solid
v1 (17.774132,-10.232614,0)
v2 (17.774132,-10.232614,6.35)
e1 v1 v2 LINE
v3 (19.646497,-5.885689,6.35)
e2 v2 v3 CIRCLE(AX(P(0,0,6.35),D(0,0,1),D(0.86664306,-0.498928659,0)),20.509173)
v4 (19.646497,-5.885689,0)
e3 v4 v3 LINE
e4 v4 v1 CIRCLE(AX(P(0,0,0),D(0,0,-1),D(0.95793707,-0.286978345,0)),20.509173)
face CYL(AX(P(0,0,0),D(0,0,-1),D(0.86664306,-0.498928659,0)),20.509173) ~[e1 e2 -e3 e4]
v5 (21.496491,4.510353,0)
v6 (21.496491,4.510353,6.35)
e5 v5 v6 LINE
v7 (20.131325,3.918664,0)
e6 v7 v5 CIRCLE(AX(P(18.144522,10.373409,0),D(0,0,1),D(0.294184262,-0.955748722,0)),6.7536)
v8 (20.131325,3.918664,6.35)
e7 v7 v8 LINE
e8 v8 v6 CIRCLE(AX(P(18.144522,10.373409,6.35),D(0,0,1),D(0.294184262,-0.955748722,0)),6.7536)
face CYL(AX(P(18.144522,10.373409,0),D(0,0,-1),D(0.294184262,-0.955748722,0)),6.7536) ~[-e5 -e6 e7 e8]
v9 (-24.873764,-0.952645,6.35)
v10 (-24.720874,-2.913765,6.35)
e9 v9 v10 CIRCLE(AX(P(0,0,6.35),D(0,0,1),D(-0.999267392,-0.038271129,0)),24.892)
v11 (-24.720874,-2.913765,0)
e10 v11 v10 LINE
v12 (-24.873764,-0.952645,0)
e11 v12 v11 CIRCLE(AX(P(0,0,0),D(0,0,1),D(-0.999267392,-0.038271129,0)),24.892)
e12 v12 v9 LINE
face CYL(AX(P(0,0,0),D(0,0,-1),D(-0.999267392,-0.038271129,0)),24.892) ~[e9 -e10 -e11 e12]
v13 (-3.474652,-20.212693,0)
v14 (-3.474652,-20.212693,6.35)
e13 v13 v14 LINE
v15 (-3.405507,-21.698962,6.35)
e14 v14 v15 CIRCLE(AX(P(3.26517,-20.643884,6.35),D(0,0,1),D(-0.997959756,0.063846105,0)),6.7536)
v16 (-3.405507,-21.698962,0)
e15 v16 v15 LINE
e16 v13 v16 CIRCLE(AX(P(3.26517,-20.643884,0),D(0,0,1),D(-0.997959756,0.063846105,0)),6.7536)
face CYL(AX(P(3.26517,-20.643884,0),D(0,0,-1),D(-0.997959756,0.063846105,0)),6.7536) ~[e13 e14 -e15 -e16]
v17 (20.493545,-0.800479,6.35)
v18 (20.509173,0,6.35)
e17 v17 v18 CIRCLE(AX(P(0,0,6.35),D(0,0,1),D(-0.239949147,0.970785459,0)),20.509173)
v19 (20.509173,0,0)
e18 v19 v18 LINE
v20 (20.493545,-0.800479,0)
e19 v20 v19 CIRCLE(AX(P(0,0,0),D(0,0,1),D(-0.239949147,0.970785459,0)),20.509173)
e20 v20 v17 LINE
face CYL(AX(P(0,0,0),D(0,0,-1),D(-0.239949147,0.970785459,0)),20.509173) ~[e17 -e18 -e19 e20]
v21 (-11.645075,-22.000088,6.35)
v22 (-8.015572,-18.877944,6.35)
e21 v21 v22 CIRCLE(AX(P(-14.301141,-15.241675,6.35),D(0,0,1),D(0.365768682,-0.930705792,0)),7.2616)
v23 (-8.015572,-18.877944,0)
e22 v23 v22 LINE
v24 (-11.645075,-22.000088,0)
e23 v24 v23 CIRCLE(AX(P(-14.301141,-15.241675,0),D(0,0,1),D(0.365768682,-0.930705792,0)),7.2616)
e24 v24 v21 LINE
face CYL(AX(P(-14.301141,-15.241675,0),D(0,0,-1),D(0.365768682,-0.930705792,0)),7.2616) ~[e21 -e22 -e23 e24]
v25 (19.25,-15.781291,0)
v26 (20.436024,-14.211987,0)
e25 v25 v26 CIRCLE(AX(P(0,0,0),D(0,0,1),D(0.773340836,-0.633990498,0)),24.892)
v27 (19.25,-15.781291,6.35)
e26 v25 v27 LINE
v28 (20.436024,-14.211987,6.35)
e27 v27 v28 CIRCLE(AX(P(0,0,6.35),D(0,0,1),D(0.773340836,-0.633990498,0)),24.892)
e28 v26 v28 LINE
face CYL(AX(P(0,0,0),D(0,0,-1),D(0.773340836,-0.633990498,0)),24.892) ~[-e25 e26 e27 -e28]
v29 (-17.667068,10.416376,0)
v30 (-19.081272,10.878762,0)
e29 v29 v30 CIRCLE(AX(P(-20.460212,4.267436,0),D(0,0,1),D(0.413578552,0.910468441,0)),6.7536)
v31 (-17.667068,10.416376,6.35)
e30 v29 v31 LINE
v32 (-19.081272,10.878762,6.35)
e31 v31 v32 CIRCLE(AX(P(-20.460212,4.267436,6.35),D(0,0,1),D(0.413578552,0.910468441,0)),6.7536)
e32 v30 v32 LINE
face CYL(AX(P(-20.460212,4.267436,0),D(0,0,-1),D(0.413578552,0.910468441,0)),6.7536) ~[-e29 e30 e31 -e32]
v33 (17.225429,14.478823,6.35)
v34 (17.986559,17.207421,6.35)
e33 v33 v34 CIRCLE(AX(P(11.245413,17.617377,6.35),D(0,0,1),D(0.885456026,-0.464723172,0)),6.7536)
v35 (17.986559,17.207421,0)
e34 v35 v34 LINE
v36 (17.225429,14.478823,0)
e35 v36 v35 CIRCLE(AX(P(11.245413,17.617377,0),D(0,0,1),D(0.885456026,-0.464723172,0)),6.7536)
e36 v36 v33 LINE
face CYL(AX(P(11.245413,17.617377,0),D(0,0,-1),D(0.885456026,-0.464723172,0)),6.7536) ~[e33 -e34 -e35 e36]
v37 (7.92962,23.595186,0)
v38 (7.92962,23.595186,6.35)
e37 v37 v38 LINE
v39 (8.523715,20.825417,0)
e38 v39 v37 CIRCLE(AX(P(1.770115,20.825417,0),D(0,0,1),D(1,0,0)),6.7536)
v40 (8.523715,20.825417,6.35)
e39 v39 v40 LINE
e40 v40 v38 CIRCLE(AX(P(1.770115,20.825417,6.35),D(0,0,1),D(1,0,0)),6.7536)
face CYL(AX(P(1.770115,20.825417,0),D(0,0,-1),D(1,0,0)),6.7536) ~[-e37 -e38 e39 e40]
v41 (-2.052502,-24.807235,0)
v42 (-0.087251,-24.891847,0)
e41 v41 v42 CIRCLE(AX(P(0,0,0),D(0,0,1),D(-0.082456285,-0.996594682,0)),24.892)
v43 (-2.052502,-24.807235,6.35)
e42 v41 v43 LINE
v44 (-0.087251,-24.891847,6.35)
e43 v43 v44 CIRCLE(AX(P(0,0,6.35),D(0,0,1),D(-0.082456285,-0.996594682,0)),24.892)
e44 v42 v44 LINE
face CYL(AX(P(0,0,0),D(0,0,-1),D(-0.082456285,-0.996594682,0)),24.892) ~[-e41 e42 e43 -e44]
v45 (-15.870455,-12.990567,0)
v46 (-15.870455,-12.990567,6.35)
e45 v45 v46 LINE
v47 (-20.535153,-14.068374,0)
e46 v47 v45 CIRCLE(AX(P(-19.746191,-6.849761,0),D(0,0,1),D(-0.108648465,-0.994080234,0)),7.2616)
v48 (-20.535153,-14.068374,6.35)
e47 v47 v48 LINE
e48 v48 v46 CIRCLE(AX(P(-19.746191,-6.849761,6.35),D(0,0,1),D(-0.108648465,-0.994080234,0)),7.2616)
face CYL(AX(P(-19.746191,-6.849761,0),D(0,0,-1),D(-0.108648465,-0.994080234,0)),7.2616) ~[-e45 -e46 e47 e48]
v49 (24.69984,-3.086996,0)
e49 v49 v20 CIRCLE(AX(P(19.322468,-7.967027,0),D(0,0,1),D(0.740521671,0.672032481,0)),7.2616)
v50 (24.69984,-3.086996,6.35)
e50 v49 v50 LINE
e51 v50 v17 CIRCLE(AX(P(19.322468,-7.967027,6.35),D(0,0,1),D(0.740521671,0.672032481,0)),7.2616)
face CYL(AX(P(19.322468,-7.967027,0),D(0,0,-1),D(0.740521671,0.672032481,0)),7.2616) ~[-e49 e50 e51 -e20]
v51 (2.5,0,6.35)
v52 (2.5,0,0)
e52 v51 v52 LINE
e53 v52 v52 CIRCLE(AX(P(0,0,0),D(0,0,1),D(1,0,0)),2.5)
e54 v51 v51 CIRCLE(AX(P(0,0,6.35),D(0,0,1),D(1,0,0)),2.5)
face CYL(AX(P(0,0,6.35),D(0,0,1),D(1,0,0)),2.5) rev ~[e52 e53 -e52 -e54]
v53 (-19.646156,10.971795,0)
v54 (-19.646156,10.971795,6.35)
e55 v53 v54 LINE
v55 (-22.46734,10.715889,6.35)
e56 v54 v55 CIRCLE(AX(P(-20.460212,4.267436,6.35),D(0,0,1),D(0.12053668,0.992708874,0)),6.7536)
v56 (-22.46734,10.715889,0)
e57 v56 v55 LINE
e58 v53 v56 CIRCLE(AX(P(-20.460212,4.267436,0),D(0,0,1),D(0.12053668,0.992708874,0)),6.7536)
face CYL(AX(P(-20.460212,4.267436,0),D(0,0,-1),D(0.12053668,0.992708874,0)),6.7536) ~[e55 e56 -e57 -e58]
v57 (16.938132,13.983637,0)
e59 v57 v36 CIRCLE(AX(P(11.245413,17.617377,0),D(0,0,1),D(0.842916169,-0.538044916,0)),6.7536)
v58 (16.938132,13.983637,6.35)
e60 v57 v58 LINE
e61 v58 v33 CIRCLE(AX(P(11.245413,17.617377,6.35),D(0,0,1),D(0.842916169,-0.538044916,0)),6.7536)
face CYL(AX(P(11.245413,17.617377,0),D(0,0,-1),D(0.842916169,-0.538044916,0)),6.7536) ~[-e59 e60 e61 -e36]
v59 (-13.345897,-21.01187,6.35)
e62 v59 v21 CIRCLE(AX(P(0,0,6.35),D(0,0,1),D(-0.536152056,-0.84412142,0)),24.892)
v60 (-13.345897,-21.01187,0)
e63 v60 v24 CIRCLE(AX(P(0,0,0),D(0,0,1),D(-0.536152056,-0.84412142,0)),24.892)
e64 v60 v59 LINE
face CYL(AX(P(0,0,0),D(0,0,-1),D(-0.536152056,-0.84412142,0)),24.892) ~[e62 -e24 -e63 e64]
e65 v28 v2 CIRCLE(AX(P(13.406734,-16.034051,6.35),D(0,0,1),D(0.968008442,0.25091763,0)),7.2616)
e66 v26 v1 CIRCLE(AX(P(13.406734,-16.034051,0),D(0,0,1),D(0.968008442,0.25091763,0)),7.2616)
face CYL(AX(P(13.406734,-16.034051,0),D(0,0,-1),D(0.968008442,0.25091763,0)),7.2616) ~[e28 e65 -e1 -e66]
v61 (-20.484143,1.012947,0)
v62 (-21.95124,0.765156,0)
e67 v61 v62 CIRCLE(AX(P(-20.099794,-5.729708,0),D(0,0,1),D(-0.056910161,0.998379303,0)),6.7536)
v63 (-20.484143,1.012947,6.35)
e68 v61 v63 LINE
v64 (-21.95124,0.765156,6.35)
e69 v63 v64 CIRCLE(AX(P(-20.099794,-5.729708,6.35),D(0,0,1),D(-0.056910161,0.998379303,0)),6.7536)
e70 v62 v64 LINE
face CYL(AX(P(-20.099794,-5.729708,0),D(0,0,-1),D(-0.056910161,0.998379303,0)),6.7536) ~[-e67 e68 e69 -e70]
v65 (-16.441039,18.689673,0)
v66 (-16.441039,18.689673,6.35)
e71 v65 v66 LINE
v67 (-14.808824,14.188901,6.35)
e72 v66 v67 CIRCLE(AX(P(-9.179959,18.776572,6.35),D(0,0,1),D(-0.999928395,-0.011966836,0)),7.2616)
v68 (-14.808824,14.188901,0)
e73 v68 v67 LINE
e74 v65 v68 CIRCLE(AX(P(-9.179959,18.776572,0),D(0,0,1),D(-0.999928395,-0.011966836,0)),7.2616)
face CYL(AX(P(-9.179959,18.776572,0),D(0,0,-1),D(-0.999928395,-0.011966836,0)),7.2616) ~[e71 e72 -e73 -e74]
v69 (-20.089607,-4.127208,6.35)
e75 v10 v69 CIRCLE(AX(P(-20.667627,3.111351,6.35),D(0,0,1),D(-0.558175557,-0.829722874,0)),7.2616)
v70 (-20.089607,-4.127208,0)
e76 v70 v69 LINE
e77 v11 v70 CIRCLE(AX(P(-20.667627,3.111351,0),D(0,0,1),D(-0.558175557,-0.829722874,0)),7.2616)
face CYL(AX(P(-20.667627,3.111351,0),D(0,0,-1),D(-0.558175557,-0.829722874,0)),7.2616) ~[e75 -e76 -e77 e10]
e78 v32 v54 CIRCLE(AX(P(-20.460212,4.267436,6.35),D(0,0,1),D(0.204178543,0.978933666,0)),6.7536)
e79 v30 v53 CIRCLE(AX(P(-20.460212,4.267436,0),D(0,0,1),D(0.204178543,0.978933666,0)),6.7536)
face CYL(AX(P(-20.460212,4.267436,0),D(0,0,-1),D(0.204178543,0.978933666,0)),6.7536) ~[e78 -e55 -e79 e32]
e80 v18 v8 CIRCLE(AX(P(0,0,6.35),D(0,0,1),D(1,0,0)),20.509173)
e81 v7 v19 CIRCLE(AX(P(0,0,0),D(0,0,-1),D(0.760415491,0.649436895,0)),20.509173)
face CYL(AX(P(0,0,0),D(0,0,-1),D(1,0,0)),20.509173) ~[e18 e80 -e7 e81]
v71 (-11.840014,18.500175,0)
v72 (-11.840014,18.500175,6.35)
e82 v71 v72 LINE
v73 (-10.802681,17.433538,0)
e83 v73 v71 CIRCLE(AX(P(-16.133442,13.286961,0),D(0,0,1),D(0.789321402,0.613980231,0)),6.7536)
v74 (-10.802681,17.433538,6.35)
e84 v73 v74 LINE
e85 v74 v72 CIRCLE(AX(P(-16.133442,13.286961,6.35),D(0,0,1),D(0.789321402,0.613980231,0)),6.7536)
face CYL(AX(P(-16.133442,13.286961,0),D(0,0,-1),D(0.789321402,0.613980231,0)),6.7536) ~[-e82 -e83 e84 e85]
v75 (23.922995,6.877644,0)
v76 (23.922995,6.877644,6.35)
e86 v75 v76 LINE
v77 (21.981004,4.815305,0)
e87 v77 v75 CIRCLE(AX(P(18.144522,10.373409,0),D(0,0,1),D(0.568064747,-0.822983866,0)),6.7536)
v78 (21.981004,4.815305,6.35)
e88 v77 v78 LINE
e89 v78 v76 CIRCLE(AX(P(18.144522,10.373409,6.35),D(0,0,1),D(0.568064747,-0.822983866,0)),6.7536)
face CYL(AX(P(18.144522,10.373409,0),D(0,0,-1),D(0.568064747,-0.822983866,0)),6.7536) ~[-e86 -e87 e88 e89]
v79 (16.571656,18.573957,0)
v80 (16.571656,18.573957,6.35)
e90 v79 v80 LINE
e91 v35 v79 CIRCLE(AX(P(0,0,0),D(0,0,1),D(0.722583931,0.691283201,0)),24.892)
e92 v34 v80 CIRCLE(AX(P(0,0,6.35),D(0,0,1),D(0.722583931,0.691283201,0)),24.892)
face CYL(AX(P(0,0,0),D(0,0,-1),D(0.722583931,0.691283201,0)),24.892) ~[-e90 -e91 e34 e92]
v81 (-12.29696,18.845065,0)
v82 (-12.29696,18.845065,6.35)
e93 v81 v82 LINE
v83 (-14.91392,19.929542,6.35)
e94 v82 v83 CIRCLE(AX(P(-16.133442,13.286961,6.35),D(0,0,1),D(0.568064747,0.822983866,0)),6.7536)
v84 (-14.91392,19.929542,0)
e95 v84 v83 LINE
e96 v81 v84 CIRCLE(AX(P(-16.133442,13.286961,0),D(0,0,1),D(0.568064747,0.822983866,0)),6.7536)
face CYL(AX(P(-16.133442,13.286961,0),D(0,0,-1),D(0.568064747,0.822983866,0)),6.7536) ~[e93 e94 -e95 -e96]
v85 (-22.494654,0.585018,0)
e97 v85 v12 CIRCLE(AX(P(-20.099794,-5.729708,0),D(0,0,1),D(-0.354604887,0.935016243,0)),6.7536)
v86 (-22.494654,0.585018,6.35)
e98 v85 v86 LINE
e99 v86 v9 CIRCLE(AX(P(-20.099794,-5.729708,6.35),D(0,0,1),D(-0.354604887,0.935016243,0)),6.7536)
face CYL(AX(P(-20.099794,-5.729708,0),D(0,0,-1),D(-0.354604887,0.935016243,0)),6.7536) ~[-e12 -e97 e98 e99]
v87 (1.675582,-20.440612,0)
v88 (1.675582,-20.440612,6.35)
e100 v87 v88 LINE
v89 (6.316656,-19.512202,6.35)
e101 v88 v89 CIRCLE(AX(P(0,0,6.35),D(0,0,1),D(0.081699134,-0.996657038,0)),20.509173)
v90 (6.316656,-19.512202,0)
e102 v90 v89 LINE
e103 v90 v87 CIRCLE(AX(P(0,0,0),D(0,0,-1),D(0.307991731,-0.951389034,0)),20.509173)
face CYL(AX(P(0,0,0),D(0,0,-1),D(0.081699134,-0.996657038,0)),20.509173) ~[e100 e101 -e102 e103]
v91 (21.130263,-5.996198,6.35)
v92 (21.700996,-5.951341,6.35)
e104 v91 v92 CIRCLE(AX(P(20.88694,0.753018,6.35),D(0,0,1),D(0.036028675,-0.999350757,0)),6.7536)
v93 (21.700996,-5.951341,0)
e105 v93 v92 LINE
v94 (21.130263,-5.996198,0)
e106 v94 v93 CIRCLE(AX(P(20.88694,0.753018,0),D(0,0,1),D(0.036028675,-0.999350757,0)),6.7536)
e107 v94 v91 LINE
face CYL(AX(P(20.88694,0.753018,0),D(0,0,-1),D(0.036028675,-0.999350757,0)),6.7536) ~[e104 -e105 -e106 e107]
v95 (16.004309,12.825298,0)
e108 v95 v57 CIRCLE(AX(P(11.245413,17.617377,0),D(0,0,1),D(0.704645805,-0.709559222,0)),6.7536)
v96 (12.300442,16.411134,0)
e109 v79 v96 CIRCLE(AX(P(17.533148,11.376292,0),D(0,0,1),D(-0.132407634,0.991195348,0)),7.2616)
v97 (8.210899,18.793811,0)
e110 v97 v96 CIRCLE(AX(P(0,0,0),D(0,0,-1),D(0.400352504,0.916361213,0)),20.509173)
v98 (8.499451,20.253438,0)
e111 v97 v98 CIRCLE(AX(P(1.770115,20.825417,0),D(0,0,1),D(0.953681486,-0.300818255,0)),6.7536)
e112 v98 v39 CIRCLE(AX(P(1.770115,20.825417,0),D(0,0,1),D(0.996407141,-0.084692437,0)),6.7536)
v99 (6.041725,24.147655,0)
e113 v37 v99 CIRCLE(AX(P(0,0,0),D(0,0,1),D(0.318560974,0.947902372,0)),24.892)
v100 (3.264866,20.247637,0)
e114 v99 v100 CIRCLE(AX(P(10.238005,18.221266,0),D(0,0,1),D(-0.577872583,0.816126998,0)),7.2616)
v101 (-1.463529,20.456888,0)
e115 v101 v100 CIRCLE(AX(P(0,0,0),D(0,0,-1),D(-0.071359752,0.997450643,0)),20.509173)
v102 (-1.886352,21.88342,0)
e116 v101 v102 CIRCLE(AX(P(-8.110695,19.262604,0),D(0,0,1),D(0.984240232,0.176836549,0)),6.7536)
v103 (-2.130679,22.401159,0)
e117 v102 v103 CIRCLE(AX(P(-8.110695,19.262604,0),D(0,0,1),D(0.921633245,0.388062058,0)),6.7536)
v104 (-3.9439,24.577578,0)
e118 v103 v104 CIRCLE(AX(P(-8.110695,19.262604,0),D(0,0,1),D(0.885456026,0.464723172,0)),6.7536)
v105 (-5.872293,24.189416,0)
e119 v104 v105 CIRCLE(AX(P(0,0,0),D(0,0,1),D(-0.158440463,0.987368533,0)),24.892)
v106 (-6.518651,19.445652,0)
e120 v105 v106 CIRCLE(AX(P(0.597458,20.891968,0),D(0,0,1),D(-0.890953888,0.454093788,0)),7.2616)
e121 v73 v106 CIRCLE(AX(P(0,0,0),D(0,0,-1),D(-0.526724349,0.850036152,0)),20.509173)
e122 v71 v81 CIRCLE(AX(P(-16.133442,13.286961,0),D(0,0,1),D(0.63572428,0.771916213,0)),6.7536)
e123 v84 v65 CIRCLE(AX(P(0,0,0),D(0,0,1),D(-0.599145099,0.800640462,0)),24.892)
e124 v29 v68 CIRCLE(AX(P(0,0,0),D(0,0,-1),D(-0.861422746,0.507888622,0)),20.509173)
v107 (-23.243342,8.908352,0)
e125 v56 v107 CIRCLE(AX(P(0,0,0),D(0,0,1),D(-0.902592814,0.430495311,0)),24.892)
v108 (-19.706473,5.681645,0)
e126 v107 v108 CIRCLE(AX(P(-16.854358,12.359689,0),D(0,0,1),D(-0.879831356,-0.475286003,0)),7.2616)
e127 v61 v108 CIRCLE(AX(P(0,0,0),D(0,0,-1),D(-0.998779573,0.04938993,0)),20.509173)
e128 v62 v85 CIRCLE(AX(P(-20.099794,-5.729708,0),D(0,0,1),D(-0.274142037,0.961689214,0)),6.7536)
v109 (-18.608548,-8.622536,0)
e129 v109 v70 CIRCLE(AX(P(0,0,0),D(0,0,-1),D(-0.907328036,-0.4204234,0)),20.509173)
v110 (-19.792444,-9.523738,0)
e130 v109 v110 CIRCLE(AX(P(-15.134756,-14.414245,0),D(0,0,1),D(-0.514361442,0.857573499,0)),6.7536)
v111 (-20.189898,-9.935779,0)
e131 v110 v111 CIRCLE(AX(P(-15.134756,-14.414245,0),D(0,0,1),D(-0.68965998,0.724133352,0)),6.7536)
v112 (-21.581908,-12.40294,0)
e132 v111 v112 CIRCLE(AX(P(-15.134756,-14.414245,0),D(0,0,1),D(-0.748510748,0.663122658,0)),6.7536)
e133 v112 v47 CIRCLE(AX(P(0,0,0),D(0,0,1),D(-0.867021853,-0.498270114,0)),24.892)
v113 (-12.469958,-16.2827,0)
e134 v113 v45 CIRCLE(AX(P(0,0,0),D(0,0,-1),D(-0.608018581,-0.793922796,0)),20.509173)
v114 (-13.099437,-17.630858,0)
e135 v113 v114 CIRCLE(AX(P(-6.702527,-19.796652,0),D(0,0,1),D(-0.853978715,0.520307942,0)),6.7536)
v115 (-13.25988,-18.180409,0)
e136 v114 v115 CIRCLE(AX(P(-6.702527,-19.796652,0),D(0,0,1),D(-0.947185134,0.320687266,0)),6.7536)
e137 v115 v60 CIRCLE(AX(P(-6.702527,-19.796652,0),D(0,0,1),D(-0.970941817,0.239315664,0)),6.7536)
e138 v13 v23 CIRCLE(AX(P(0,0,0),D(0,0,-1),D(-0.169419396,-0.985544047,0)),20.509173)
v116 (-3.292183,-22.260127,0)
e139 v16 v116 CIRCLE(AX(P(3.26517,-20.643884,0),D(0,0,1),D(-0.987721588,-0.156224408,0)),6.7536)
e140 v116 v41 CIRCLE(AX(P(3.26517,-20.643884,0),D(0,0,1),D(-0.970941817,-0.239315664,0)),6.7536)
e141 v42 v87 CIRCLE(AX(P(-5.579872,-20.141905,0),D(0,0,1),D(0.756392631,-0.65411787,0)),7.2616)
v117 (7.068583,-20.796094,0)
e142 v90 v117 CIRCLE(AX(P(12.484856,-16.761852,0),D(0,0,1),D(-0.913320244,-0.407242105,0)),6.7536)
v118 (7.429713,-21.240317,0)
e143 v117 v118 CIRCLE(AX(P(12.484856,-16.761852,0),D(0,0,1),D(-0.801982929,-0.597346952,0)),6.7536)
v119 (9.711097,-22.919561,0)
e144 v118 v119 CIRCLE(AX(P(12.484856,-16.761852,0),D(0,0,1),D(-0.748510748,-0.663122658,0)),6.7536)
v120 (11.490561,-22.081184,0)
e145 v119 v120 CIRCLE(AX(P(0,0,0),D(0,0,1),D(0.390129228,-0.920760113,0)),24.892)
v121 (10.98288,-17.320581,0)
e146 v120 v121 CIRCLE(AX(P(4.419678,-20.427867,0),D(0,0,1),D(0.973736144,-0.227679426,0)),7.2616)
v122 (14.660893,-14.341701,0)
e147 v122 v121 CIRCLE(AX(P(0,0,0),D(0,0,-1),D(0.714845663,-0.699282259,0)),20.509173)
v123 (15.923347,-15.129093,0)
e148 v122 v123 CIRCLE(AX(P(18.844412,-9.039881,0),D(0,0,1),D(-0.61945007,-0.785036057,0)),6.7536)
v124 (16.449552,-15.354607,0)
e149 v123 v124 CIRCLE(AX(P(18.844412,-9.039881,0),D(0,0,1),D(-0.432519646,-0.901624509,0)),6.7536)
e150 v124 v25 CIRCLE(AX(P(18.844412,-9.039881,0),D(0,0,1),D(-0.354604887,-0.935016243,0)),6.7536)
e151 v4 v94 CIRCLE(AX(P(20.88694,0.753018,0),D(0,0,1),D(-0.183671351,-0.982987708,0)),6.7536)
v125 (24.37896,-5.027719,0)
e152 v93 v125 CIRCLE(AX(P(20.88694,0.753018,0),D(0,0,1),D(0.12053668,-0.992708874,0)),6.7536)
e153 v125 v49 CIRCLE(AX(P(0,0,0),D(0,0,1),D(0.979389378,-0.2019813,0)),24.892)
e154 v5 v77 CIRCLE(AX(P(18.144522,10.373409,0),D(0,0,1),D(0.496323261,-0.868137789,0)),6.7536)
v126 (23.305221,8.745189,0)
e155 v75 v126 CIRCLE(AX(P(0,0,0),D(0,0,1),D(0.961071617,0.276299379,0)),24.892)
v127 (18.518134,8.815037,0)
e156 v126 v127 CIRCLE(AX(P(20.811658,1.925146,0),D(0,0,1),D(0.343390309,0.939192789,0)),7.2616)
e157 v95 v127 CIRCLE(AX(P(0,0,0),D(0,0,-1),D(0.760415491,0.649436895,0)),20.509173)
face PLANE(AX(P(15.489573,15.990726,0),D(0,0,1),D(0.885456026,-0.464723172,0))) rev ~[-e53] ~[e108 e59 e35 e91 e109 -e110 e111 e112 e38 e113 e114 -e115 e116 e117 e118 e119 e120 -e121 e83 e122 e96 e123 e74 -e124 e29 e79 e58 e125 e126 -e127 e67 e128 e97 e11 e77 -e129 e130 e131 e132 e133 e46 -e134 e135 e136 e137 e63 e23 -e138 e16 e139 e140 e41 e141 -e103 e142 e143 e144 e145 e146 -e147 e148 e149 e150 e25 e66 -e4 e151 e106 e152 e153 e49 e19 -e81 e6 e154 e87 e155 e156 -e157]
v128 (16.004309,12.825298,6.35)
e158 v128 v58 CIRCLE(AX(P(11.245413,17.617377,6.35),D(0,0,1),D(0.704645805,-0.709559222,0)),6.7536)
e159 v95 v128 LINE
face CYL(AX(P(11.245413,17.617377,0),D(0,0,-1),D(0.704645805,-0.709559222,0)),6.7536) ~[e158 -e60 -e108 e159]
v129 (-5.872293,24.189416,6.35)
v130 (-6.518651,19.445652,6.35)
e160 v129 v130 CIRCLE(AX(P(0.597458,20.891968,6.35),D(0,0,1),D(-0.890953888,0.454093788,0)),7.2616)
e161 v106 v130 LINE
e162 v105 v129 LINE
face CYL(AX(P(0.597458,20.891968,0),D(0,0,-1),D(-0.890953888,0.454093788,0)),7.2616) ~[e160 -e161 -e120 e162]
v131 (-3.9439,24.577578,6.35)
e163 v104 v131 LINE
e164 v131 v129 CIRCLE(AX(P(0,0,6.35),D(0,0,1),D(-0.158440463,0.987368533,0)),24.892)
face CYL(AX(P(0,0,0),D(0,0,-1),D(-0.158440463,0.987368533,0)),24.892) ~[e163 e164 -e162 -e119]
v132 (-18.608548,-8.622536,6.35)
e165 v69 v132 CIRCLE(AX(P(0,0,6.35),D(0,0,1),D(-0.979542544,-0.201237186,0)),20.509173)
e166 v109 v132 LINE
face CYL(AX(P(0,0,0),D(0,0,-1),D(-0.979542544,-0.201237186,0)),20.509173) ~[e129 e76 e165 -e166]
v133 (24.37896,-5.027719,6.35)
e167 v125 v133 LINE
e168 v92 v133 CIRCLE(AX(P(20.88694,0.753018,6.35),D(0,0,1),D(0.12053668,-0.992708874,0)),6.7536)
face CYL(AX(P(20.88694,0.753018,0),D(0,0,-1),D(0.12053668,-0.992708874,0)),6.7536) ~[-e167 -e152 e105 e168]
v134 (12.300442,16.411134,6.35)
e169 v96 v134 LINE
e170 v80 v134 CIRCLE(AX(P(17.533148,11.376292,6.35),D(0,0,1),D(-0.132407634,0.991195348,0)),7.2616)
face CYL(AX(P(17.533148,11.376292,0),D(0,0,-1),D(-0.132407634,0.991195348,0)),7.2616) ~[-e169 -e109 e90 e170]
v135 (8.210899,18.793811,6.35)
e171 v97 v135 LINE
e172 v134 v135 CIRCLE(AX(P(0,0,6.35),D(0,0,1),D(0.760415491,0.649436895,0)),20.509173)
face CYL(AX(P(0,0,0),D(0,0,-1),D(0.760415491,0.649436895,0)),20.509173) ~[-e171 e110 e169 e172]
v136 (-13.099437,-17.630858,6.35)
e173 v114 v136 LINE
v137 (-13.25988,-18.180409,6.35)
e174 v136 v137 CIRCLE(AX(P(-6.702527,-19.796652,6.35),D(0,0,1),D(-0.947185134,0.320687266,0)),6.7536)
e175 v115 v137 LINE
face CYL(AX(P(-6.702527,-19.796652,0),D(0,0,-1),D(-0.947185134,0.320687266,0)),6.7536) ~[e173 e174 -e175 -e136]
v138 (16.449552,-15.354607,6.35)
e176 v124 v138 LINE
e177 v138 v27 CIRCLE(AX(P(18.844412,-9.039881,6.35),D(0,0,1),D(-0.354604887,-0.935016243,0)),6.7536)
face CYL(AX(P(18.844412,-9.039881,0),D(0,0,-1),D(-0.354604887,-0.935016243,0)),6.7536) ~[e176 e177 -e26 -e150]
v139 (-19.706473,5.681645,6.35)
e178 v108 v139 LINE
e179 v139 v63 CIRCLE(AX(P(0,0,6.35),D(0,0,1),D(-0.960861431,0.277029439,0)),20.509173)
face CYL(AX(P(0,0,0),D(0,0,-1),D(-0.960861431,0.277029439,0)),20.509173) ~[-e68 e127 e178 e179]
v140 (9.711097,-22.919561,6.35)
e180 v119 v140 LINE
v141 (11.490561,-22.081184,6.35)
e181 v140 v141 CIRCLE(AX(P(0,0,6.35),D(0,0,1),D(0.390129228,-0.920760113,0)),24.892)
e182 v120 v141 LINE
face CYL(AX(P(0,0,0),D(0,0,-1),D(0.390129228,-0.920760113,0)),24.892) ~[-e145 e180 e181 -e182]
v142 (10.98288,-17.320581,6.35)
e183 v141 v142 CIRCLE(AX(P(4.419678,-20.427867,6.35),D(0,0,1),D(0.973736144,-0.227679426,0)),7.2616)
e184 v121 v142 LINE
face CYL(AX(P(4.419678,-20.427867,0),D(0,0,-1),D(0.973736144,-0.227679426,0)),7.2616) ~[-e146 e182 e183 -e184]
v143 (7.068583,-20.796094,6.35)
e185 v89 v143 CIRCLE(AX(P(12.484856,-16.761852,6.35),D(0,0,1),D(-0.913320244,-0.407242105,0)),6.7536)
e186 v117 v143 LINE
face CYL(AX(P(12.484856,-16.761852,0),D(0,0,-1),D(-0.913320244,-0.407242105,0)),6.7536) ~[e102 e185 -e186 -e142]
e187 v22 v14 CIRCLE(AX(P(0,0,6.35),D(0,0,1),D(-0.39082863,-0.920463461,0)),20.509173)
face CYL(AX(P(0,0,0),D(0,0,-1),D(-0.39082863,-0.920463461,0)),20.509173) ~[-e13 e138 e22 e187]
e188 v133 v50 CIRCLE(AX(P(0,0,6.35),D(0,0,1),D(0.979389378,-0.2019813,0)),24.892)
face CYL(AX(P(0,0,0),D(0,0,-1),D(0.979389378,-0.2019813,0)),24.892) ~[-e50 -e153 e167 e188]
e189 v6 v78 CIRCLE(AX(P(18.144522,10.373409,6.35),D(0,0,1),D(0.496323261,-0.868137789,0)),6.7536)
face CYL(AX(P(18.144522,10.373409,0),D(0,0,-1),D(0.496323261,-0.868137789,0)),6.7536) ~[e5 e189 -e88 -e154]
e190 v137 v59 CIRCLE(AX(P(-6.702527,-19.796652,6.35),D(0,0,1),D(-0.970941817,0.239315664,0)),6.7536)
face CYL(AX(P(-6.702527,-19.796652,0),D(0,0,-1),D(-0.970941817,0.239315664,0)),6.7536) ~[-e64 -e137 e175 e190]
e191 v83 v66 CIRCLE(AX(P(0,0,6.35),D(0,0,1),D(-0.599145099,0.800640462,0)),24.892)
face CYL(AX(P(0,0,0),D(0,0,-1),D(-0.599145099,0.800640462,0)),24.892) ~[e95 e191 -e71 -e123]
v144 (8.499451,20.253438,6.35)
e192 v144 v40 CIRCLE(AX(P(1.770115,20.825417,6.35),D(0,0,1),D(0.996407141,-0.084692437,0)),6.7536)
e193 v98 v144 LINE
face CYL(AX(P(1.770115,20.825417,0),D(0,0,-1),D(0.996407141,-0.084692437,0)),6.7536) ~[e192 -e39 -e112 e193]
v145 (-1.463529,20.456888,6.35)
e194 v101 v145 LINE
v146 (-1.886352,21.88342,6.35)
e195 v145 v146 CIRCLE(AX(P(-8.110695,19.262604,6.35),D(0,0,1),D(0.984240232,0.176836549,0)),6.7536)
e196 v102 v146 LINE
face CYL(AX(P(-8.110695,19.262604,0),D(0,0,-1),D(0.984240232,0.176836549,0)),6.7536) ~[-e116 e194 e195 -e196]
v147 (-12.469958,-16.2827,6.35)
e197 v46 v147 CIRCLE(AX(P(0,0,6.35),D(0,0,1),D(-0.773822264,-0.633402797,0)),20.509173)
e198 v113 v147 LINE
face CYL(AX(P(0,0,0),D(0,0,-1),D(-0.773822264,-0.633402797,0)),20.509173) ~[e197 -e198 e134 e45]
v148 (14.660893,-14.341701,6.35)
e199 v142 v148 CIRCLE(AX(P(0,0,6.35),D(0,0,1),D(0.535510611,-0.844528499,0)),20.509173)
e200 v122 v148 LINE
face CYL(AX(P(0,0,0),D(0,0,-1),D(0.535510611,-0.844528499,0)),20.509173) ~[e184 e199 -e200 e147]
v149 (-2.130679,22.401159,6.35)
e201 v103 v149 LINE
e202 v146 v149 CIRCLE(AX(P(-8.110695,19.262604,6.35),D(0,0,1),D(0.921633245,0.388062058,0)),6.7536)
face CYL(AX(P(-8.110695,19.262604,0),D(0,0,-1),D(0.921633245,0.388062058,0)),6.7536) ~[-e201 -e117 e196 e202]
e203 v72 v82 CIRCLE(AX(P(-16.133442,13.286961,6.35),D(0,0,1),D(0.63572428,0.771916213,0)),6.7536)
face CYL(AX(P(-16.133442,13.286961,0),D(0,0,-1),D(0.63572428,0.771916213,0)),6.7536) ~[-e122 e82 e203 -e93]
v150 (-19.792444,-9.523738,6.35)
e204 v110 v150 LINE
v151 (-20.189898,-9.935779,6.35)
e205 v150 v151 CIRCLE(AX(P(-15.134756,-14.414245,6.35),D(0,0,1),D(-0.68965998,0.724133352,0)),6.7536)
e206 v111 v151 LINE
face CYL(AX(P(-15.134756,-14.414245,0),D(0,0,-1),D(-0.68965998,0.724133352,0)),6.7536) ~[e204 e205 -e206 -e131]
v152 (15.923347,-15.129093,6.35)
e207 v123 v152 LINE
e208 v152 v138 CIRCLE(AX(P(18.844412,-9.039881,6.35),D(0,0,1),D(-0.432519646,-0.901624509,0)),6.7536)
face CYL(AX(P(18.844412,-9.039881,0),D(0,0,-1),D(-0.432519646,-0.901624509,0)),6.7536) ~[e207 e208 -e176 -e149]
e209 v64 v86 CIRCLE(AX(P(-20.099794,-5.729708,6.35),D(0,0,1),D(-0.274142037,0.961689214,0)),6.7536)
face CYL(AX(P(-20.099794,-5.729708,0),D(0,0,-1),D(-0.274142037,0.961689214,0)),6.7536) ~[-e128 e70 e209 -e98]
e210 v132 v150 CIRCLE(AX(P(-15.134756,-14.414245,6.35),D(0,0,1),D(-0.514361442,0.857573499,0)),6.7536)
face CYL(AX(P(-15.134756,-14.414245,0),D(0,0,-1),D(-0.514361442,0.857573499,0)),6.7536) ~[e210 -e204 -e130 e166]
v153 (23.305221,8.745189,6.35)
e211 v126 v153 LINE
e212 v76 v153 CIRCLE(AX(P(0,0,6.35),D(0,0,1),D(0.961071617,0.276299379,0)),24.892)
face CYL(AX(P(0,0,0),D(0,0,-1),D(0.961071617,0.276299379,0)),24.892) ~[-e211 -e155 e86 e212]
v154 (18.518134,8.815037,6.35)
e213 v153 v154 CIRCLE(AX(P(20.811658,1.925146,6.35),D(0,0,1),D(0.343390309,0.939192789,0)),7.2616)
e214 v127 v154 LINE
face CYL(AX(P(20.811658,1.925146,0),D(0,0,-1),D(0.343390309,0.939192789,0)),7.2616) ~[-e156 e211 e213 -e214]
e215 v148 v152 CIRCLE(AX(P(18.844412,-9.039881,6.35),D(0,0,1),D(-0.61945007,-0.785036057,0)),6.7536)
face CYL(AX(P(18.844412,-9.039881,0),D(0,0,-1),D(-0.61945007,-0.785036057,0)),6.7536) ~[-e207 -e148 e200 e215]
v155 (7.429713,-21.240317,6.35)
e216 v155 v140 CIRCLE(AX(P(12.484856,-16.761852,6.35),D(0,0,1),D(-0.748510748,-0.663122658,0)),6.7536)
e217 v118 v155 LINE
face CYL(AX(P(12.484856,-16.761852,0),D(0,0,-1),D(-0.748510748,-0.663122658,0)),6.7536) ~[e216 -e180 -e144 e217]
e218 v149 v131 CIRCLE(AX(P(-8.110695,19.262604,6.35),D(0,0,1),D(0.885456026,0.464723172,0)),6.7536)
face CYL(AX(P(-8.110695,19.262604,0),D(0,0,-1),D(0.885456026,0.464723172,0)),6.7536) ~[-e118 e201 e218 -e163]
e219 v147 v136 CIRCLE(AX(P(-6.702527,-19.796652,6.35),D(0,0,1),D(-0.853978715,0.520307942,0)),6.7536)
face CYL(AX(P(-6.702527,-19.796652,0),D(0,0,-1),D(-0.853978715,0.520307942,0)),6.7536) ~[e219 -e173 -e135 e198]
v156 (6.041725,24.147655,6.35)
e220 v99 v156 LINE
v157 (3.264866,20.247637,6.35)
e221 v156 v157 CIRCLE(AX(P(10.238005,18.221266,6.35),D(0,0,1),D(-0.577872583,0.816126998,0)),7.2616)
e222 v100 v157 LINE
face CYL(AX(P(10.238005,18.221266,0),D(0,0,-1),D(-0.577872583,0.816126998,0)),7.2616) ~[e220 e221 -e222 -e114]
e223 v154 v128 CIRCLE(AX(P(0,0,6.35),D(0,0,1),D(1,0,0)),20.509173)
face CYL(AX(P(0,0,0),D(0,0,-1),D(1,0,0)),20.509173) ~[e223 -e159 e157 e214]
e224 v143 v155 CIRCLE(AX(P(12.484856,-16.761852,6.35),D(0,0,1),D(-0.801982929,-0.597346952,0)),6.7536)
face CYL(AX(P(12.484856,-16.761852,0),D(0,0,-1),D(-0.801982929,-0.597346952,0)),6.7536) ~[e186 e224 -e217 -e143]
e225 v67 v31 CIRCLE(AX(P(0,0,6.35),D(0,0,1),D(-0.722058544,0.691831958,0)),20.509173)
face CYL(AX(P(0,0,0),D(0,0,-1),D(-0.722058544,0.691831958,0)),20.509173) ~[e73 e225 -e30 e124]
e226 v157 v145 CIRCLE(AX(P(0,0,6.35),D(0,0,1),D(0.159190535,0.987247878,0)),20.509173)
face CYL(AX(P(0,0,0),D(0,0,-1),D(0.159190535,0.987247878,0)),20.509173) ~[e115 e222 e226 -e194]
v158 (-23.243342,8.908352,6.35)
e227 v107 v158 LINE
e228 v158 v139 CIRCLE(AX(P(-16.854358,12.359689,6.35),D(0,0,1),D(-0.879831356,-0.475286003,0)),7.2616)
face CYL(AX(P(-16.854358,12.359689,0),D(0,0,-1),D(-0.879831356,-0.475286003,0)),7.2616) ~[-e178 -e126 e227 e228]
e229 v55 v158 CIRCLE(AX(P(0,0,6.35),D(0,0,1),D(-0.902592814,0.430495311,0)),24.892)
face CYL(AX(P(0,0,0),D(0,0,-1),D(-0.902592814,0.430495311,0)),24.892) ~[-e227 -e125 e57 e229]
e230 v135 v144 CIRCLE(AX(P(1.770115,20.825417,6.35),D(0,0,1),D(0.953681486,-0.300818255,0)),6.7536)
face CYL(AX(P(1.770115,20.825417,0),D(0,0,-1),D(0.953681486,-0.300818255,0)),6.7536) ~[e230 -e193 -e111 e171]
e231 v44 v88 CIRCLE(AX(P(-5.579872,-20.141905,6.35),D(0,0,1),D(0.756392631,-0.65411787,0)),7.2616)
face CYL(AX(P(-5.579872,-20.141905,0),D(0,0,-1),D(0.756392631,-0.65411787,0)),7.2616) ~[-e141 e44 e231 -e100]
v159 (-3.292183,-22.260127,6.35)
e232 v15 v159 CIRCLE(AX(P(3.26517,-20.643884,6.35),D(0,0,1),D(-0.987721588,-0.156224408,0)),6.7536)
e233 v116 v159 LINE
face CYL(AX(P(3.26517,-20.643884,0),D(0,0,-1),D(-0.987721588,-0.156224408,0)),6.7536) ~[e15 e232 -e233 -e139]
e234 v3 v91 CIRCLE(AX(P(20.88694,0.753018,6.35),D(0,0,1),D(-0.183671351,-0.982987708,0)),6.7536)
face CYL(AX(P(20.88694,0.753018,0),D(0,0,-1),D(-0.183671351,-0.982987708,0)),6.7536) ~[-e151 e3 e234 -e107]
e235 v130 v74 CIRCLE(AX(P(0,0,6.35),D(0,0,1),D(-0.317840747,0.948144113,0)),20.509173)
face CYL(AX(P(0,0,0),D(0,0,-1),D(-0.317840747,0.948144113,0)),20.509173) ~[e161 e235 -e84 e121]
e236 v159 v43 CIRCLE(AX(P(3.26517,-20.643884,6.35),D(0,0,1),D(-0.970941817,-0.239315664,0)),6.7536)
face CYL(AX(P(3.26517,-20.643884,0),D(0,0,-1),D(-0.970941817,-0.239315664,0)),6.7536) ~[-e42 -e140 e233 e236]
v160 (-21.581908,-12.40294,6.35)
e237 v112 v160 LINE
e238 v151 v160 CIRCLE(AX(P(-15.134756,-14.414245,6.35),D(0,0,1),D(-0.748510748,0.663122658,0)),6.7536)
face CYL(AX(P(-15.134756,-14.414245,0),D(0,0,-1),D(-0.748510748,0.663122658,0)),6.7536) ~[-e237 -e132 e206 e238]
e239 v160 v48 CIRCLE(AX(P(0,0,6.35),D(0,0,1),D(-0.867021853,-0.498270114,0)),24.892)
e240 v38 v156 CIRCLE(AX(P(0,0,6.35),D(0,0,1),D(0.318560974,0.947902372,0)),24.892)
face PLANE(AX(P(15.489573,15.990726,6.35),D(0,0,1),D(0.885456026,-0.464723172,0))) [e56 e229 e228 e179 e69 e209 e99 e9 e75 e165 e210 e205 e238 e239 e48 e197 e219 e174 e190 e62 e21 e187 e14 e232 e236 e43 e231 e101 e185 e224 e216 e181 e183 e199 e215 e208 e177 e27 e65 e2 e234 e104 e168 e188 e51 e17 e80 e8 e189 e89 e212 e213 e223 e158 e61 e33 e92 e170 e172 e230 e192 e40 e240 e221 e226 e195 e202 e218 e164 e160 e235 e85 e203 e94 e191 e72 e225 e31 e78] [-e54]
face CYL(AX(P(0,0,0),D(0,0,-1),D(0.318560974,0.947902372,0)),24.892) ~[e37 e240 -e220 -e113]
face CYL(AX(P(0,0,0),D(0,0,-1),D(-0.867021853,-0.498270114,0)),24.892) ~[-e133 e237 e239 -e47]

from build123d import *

# Parameters (mm, degrees)
F1_DEPTH = 6.35
F2_COUNT = 13
F3_R     = 2.5
F4_DEPTH = 25.4


with BuildPart() as f1:
    # F0 (on Top) → F1 (new body)
    with BuildSketch(Plane.XY):
        with BuildLine():
            ThreePointArc((7.9296197565, 23.5951858335), (6.9911317973, 23.8900761864), (6.0417249702, 24.1476546146))
            ThreePointArc((6.0417249702, 24.1476546146), (4.3226425573, 22.4330749308), (3.2648662162, 20.2476374354))
            ThreePointArc((3.2648662162, 20.2476374354), (5.7837443287, 19.6767495961), (8.2108987358, 18.7938105523))
            ThreePointArc((8.2108987358, 18.7938105523), (8.3954934616, 19.5156536929), (8.4994507341, 20.2534379554))
            ThreePointArc((8.4994507341, 20.2534379554), (8.5176465567, 20.5391701676), (8.5237154667, 20.8254168329))
            ThreePointArc((8.5237154667, 20.8254168329), (8.373521449, 22.2418004346), (7.9296197565, 23.5951858335))
        make_face()
        with BuildLine():
            ThreePointArc((4.0264902572, 14.4598933509), (-1.7431476836, 15.057566034), (-4.9211585336, 19.9100068261))
            ThreePointArc((-4.9211585336, 19.9100068261), (-12.6431262329, -16.1486077476), (20.5091729021, 0))
            ThreePointArc((20.5091729021, 0), (19.2415803806, 7.0984334598), (15.5954927821, 13.3194135761))
            ThreePointArc((15.5954927821, 13.3194135761), (9.5256046991, 10.9946956396), (4.0264902572, 14.4598933509))
        make_face()
        with BuildLine():
            ThreePointArc((3.2648662162, 20.2476374354), (-0.8451772993, 20.4917507417), (-4.9211585336, 19.9100068261))
            ThreePointArc((-4.9211585336, 19.9100068261), (-1.7431476836, 15.057566034), (4.0264902572, 14.4598933509))
            ThreePointArc((4.0264902572, 14.4598933509), (3.0384725246, 17.2738616412), (3.2648662162, 20.2476374354))
        make_face()
        with BuildLine():
            ThreePointArc((4.0264902572, 14.4598933509), (9.5256046991, 10.9946956396), (15.5954927821, 13.3194135761))
            ThreePointArc((15.5954927821, 13.3194135761), (12.2138579016, 16.4756744411), (8.2108987358, 18.7938105523))
            ThreePointArc((8.2108987358, 18.7938105523), (6.6287005247, 16.1344397874), (4.0264902572, 14.4598933509))
        make_face()
        with BuildLine():
            ThreePointArc((8.2108987358, 18.7938105523), (5.7837443287, 19.6767495961), (3.2648662162, 20.2476374354))
            ThreePointArc((3.2648662162, 20.2476374354), (3.0384725246, 17.2738616412), (4.0264902572, 14.4598933509))
            ThreePointArc((4.0264902572, 14.4598933509), (6.6287005247, 16.1344397874), (8.2108987358, 18.7938105523))
        make_face()
    extrude(amount=F1_DEPTH)

    # F2: F1 ×13 about axis
    f2_axis = Axis((0, 0, 6.35), (0, 0, 1))


with BuildPart() as f1_1:
    add(f1.part)
    for i in range(1, F2_COUNT):
        add(f1.part.rotate(f2_axis, i * 360 / F2_COUNT))

    # F3 (on face) → F4 (cut)
    with BuildSketch(Plane.XY.offset(6.35)):
        Circle(F3_R)
    extrude(amount=-F4_DEPTH, mode=Mode.SUBTRACT)


solid = f1_1.part
